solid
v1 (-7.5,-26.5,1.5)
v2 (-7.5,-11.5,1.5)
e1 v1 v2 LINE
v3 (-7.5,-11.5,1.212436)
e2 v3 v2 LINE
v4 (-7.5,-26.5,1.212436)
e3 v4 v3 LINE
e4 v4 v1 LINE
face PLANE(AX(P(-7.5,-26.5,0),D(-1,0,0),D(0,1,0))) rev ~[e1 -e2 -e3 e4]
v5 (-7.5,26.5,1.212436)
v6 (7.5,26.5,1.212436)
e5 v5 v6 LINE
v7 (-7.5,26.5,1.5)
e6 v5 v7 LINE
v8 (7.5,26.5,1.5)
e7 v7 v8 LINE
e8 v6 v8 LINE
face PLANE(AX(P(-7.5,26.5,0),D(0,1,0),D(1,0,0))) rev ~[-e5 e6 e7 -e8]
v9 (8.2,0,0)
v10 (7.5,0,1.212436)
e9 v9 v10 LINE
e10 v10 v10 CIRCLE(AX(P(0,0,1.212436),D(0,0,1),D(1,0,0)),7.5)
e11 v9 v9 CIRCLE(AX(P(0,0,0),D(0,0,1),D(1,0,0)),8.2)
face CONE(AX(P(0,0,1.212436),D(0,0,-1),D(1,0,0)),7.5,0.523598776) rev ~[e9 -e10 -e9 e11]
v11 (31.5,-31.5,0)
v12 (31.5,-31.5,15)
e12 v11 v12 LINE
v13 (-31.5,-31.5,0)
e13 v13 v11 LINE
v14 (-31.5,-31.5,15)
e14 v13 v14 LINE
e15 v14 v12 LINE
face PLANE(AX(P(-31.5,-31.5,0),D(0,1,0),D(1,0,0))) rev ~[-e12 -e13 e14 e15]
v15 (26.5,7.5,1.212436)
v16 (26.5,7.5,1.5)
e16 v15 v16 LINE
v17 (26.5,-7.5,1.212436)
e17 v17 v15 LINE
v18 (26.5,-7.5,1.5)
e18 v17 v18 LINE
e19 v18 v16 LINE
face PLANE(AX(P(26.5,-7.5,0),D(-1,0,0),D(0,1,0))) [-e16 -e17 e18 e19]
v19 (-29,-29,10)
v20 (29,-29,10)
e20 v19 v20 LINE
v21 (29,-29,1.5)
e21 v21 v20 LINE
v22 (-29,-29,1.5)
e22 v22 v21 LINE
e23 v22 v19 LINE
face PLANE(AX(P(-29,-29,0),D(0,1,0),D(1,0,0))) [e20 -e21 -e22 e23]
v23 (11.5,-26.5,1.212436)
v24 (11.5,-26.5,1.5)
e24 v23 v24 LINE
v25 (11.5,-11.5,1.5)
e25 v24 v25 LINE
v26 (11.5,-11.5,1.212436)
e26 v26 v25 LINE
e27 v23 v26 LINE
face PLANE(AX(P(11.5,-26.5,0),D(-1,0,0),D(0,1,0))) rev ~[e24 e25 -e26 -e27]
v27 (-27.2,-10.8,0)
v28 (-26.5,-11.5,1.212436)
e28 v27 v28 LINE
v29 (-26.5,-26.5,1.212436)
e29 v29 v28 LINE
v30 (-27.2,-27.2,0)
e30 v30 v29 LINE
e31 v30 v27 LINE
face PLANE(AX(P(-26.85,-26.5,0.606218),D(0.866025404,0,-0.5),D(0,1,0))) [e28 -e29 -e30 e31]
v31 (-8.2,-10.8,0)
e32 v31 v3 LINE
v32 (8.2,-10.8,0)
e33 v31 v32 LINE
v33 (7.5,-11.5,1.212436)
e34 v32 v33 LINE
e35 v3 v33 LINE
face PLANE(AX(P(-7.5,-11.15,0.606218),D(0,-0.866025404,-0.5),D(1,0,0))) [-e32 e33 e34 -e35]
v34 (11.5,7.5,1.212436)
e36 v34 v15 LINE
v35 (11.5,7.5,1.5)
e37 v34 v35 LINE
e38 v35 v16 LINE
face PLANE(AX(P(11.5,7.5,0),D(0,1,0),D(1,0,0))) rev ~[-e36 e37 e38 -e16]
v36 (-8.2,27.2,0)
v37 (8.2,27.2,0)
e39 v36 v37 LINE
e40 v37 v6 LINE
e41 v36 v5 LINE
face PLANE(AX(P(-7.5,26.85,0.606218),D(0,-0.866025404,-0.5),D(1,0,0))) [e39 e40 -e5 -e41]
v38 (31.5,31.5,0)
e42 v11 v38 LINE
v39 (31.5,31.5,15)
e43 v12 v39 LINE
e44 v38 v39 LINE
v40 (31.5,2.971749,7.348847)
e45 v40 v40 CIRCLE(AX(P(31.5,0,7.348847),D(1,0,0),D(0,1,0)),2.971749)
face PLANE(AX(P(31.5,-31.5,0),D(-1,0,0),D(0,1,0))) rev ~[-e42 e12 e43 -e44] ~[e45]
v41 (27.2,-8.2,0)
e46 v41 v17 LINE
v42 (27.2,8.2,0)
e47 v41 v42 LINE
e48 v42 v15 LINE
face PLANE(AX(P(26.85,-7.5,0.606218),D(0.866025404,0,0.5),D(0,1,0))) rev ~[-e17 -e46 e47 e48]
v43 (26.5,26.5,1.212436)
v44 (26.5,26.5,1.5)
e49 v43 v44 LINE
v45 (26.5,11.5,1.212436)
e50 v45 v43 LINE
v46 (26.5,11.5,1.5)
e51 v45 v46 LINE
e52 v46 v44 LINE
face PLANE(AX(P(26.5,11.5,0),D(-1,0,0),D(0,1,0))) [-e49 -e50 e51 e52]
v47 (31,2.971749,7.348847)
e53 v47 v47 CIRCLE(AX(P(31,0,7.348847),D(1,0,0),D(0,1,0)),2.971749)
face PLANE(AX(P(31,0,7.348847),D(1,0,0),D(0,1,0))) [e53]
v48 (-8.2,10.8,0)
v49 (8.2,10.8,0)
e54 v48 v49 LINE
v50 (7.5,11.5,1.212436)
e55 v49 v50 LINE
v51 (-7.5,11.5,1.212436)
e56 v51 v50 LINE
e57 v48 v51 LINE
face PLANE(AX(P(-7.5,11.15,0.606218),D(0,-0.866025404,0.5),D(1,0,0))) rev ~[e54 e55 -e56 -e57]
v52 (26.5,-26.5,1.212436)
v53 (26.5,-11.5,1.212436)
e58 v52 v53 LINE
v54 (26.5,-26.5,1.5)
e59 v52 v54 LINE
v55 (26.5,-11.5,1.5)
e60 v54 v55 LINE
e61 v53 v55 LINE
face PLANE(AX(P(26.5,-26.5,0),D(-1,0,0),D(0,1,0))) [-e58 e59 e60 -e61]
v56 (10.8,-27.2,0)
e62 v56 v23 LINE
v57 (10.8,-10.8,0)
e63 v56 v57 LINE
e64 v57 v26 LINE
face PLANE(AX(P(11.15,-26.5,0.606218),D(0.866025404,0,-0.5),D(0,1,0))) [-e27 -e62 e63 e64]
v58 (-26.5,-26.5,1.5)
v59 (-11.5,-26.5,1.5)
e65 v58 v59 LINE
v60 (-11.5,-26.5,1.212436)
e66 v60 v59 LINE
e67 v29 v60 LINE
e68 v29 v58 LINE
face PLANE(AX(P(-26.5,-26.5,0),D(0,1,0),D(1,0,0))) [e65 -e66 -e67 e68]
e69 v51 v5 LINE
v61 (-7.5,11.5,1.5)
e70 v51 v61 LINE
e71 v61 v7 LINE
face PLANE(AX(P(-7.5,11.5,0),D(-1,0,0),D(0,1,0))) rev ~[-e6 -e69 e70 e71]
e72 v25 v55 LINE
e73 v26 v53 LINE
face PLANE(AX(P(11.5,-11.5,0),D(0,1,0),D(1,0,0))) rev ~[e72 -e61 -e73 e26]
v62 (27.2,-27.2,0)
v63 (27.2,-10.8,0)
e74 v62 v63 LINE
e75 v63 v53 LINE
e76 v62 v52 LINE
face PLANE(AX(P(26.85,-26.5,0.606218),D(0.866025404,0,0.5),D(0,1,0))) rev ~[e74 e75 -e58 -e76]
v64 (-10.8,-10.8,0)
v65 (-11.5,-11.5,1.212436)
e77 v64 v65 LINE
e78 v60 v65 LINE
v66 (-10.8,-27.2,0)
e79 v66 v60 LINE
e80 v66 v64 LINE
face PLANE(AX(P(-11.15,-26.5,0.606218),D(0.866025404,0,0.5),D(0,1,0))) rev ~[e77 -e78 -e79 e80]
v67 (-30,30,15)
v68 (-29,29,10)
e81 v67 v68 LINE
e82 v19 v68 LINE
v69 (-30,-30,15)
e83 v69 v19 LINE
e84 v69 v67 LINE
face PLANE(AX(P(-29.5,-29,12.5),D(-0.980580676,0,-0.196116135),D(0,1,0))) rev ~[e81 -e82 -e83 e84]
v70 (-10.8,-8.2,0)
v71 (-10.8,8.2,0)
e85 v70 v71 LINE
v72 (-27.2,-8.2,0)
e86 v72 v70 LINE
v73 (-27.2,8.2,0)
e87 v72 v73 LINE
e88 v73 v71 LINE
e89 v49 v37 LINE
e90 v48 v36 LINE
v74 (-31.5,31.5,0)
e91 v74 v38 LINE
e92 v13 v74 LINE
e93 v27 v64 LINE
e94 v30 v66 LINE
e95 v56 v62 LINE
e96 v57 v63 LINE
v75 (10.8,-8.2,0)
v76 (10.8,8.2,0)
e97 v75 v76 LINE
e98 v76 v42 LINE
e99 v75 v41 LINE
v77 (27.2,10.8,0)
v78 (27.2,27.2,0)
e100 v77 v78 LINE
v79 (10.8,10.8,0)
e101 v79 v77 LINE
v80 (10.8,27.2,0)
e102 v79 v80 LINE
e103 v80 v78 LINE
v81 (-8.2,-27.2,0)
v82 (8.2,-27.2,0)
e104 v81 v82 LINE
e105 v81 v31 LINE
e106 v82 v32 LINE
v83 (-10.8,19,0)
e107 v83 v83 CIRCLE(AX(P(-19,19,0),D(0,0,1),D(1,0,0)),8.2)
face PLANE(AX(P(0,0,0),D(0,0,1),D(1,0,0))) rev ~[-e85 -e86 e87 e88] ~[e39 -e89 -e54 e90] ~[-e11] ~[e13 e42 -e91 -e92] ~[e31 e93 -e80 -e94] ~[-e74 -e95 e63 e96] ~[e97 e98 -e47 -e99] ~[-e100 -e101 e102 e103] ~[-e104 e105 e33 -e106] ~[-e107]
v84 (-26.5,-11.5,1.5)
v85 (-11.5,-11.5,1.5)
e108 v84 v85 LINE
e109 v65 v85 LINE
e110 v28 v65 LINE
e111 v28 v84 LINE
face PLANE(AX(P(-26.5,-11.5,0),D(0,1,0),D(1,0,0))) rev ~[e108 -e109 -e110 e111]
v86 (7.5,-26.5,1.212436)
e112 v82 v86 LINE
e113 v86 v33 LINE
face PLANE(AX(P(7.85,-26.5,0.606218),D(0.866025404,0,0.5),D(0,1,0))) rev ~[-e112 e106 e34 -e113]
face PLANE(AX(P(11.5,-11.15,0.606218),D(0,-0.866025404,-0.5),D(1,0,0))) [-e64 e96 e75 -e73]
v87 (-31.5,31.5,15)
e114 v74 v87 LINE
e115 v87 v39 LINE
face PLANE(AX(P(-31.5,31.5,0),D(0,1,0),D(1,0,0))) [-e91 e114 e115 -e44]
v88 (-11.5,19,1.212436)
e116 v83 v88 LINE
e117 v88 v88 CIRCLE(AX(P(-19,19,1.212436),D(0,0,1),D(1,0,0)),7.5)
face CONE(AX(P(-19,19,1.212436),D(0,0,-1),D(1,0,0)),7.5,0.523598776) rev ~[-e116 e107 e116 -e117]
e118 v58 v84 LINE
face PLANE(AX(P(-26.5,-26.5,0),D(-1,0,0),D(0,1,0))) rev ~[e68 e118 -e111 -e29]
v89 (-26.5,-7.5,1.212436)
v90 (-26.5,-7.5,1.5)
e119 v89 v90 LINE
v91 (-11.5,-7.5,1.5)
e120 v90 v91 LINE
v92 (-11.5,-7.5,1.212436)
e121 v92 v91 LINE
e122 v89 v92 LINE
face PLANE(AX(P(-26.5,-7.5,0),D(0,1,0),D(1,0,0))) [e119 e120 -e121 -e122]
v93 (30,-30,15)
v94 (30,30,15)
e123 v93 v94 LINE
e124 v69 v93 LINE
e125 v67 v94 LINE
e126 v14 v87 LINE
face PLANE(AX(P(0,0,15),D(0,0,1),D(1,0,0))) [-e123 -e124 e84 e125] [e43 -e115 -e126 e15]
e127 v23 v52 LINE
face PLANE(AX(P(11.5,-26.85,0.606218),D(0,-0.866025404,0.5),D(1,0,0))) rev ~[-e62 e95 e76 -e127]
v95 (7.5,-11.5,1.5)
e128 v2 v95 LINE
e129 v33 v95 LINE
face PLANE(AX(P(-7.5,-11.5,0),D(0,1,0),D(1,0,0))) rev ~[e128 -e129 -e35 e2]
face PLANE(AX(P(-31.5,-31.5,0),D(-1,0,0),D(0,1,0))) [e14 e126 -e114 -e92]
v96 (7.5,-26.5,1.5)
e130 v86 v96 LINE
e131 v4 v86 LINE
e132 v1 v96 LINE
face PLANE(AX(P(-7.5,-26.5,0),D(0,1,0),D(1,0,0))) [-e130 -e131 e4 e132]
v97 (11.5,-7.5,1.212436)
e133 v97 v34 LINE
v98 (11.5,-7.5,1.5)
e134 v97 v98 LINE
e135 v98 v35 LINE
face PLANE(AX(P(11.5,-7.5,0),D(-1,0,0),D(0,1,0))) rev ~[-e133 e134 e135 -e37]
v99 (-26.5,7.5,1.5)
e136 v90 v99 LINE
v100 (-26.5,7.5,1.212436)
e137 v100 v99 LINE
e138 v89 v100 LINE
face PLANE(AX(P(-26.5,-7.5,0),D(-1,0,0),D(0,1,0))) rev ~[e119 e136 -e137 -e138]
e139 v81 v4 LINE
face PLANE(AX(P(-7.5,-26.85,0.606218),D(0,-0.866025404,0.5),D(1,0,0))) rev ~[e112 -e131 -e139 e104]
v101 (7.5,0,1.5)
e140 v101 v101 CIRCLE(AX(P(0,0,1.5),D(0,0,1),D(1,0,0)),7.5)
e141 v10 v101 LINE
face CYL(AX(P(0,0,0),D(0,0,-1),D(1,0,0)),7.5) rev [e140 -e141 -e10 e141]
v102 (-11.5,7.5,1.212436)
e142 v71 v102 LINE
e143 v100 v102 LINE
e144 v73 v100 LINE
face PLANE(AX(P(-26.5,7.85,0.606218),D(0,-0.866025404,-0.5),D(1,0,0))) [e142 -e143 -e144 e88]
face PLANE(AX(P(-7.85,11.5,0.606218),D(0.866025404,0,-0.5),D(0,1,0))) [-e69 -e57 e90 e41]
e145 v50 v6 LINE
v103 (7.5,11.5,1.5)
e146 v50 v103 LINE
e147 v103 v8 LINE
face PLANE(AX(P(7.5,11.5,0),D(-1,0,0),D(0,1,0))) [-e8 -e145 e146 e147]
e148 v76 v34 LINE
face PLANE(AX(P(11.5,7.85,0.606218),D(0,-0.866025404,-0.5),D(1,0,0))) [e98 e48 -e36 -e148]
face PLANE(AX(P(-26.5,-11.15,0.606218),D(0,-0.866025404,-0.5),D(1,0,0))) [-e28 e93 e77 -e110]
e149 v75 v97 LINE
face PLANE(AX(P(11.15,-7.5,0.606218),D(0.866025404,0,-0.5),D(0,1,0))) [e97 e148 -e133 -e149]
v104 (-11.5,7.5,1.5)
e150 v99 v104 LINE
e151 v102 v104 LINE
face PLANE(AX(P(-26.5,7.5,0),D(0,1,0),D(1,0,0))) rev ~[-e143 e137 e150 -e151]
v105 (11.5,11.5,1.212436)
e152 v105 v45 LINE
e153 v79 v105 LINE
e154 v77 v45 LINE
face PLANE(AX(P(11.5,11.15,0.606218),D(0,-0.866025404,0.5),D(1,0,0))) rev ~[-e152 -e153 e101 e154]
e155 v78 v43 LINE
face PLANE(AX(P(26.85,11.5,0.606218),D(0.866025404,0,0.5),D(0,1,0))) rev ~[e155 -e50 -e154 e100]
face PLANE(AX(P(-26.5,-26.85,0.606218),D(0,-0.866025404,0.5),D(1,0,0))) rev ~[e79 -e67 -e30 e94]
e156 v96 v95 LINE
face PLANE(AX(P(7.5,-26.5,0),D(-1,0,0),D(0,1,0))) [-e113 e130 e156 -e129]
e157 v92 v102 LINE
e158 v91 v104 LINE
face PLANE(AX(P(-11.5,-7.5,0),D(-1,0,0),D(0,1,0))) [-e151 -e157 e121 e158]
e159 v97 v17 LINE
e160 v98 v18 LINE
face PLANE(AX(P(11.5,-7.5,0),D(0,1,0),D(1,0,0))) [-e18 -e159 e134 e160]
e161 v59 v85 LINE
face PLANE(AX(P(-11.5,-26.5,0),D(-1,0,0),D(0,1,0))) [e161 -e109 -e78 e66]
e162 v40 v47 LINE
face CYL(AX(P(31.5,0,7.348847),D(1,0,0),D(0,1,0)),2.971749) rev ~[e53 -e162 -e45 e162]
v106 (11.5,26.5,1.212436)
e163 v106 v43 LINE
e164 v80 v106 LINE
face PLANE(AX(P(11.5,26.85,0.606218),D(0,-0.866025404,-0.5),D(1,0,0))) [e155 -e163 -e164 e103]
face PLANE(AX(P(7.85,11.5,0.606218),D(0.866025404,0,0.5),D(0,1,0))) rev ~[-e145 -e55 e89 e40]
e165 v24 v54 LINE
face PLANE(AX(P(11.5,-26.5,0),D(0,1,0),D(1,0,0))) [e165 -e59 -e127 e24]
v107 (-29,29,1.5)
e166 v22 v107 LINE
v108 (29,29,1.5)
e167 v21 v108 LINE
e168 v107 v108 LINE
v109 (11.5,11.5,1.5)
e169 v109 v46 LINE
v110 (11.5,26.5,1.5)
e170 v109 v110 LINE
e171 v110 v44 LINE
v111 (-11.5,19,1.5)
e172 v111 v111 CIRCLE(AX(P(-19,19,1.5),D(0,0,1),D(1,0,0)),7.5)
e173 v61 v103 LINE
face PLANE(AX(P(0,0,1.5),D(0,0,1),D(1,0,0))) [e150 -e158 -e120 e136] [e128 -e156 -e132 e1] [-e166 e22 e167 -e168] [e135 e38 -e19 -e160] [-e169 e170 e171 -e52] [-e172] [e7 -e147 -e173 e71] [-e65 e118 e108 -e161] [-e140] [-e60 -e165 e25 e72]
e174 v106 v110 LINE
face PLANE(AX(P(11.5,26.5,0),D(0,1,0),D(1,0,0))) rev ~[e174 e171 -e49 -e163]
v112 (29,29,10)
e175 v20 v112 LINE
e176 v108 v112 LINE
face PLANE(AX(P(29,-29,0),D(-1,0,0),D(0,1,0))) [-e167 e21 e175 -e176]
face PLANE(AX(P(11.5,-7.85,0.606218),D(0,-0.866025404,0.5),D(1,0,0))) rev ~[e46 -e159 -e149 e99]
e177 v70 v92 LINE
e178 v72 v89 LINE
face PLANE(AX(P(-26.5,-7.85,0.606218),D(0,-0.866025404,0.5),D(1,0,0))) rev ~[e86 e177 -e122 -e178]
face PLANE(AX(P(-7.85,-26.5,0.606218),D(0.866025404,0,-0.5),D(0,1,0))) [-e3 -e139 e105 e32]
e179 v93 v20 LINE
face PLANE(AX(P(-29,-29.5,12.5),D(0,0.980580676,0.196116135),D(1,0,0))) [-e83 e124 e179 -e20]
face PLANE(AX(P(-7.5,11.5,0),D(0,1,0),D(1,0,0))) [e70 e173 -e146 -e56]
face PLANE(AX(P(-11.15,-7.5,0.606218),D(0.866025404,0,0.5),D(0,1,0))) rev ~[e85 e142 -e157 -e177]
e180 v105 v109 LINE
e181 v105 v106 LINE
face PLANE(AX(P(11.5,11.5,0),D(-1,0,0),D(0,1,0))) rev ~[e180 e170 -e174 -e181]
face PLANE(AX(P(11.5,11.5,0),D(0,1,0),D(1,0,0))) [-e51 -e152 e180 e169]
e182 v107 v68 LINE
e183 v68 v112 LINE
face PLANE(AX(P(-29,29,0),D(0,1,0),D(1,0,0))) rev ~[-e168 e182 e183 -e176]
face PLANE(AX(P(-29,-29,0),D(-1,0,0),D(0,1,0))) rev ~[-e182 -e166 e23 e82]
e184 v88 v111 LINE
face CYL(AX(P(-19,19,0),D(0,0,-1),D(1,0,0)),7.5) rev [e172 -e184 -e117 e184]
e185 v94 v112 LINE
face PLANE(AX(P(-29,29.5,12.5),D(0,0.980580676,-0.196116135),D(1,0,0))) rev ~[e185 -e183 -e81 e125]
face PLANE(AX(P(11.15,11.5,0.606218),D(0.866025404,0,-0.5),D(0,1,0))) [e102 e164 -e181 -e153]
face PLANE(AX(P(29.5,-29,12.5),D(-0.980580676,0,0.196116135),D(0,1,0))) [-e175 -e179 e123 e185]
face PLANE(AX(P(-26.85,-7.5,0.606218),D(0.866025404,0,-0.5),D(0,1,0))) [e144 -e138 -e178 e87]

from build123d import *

# Parameters (mm, degrees)
F0_W     = 58
F0_H     = 58
F0_W_2   = 15
F0_H_2   = 15
F0_R     = 7.5
F1_DEPTH = 1.5
F2_W     = 63
F2_H     = 63
F2_W_2   = 58
F2_H_2   = 58
F3_DEPTH = 15
F4_SIZE2 = 1.2124355653
F4_SIZE  = 0.7
F5_SIZE2 = 5
F5_SIZE  = 1
F6_R     = 2.971748634
F7_DEPTH = 0.5


# Not quite as in the source:
# - a feature names something its author has since deleted; it is built from what else it names


with BuildPart() as f1:
    # F0 (on Top) → F1 (new body)
    with BuildSketch(Plane.XY):
        Rectangle(F0_W, F0_H)
        with Locations((-19, -19)):
            Rectangle(F0_W_2, F0_H_2, mode=Mode.SUBTRACT)
        with Locations((0, -19)):
            Rectangle(F0_W_2, F0_H_2, mode=Mode.SUBTRACT)
        with Locations((19, -19)):
            Rectangle(F0_W_2, F0_H_2, mode=Mode.SUBTRACT)
        with Locations((-19, 0)):
            Rectangle(F0_W_2, F0_H_2, mode=Mode.SUBTRACT)
        with Locations((-19, 19)):
            Circle(F0_R, mode=Mode.SUBTRACT)
        Circle(F0_R, mode=Mode.SUBTRACT)
        with Locations((19, 0)):
            Rectangle(F0_W_2, F0_H_2, mode=Mode.SUBTRACT)
        with Locations((0, 19)):
            Rectangle(F0_W_2, F0_H_2, mode=Mode.SUBTRACT)
        with Locations((19, 19)):
            Rectangle(F0_W_2, F0_H_2, mode=Mode.SUBTRACT)
    extrude(amount=F1_DEPTH)

    # F2 (on Top) → F3 (join)
    with BuildSketch(Plane.XY):
        Rectangle(F2_W, F2_H)
        Rectangle(F2_W_2, F2_H_2, mode=Mode.SUBTRACT)
    extrude(amount=F3_DEPTH)

    # F4
    f4_edges = [f1.edges().sort_by_distance(p)[0] for p in [
        (-26.5, 19, 0),
        (-7.5, 0, 0),
        (-11.5, 0, 0),
        (-19, 7.5, 0),
        (-26.5, 0, 0),
        (-19, -7.5, 0),
        (-19, -11.5, 0),
        (-11.5, -19, 0),
        (-26.5, -19, 0),
        (-19, -26.5, 0),
        (0, -26.5, 0),
        (-7.5, -19, 0),
        (0, -11.5, 0),
        (7.5, -19, 0),
        (11.5, -19, 0),
        (19, -11.5, 0),
        (26.5, -19, 0),
        (19, -26.5, 0),
        (19, -7.5, 0),
        (11.5, 0, 0),
        (19, 7.5, 0),
        (26.5, 0, 0),
        (19, 11.5, 0),
        (11.5, 19, 0),
        (19, 26.5, 0),
        (26.5, 19, 0),
        (7.5, 19, 0),
        (0, 11.5, 0),
        (-7.5, 19, 0),
        (0, 26.5, 0),
    ]]
    chamfer(f4_edges, length=F4_SIZE, length2=F4_SIZE2)

    # F5
    f5_edges = [f1.edges().sort_by_distance(p)[0] for p in [
        (-29, 0, 15),
        (0, 29, 15),
        (29, 0, 15),
        (0, -29, 15),
    ]]
    f5_side = f1.faces().sort_by_distance((0, -30.609045, 15))[0]
    chamfer(f5_edges, length=F5_SIZE, length2=F5_SIZE2, reference=f5_side)

    # F6 (on face) → F7 (cut)
    with BuildSketch(Plane.YZ.offset(31.5)):
        with Locations((0, 7.3488471098)):
            Circle(F6_R)
    extrude(amount=-F7_DEPTH, mode=Mode.SUBTRACT)


solid = f1.part
